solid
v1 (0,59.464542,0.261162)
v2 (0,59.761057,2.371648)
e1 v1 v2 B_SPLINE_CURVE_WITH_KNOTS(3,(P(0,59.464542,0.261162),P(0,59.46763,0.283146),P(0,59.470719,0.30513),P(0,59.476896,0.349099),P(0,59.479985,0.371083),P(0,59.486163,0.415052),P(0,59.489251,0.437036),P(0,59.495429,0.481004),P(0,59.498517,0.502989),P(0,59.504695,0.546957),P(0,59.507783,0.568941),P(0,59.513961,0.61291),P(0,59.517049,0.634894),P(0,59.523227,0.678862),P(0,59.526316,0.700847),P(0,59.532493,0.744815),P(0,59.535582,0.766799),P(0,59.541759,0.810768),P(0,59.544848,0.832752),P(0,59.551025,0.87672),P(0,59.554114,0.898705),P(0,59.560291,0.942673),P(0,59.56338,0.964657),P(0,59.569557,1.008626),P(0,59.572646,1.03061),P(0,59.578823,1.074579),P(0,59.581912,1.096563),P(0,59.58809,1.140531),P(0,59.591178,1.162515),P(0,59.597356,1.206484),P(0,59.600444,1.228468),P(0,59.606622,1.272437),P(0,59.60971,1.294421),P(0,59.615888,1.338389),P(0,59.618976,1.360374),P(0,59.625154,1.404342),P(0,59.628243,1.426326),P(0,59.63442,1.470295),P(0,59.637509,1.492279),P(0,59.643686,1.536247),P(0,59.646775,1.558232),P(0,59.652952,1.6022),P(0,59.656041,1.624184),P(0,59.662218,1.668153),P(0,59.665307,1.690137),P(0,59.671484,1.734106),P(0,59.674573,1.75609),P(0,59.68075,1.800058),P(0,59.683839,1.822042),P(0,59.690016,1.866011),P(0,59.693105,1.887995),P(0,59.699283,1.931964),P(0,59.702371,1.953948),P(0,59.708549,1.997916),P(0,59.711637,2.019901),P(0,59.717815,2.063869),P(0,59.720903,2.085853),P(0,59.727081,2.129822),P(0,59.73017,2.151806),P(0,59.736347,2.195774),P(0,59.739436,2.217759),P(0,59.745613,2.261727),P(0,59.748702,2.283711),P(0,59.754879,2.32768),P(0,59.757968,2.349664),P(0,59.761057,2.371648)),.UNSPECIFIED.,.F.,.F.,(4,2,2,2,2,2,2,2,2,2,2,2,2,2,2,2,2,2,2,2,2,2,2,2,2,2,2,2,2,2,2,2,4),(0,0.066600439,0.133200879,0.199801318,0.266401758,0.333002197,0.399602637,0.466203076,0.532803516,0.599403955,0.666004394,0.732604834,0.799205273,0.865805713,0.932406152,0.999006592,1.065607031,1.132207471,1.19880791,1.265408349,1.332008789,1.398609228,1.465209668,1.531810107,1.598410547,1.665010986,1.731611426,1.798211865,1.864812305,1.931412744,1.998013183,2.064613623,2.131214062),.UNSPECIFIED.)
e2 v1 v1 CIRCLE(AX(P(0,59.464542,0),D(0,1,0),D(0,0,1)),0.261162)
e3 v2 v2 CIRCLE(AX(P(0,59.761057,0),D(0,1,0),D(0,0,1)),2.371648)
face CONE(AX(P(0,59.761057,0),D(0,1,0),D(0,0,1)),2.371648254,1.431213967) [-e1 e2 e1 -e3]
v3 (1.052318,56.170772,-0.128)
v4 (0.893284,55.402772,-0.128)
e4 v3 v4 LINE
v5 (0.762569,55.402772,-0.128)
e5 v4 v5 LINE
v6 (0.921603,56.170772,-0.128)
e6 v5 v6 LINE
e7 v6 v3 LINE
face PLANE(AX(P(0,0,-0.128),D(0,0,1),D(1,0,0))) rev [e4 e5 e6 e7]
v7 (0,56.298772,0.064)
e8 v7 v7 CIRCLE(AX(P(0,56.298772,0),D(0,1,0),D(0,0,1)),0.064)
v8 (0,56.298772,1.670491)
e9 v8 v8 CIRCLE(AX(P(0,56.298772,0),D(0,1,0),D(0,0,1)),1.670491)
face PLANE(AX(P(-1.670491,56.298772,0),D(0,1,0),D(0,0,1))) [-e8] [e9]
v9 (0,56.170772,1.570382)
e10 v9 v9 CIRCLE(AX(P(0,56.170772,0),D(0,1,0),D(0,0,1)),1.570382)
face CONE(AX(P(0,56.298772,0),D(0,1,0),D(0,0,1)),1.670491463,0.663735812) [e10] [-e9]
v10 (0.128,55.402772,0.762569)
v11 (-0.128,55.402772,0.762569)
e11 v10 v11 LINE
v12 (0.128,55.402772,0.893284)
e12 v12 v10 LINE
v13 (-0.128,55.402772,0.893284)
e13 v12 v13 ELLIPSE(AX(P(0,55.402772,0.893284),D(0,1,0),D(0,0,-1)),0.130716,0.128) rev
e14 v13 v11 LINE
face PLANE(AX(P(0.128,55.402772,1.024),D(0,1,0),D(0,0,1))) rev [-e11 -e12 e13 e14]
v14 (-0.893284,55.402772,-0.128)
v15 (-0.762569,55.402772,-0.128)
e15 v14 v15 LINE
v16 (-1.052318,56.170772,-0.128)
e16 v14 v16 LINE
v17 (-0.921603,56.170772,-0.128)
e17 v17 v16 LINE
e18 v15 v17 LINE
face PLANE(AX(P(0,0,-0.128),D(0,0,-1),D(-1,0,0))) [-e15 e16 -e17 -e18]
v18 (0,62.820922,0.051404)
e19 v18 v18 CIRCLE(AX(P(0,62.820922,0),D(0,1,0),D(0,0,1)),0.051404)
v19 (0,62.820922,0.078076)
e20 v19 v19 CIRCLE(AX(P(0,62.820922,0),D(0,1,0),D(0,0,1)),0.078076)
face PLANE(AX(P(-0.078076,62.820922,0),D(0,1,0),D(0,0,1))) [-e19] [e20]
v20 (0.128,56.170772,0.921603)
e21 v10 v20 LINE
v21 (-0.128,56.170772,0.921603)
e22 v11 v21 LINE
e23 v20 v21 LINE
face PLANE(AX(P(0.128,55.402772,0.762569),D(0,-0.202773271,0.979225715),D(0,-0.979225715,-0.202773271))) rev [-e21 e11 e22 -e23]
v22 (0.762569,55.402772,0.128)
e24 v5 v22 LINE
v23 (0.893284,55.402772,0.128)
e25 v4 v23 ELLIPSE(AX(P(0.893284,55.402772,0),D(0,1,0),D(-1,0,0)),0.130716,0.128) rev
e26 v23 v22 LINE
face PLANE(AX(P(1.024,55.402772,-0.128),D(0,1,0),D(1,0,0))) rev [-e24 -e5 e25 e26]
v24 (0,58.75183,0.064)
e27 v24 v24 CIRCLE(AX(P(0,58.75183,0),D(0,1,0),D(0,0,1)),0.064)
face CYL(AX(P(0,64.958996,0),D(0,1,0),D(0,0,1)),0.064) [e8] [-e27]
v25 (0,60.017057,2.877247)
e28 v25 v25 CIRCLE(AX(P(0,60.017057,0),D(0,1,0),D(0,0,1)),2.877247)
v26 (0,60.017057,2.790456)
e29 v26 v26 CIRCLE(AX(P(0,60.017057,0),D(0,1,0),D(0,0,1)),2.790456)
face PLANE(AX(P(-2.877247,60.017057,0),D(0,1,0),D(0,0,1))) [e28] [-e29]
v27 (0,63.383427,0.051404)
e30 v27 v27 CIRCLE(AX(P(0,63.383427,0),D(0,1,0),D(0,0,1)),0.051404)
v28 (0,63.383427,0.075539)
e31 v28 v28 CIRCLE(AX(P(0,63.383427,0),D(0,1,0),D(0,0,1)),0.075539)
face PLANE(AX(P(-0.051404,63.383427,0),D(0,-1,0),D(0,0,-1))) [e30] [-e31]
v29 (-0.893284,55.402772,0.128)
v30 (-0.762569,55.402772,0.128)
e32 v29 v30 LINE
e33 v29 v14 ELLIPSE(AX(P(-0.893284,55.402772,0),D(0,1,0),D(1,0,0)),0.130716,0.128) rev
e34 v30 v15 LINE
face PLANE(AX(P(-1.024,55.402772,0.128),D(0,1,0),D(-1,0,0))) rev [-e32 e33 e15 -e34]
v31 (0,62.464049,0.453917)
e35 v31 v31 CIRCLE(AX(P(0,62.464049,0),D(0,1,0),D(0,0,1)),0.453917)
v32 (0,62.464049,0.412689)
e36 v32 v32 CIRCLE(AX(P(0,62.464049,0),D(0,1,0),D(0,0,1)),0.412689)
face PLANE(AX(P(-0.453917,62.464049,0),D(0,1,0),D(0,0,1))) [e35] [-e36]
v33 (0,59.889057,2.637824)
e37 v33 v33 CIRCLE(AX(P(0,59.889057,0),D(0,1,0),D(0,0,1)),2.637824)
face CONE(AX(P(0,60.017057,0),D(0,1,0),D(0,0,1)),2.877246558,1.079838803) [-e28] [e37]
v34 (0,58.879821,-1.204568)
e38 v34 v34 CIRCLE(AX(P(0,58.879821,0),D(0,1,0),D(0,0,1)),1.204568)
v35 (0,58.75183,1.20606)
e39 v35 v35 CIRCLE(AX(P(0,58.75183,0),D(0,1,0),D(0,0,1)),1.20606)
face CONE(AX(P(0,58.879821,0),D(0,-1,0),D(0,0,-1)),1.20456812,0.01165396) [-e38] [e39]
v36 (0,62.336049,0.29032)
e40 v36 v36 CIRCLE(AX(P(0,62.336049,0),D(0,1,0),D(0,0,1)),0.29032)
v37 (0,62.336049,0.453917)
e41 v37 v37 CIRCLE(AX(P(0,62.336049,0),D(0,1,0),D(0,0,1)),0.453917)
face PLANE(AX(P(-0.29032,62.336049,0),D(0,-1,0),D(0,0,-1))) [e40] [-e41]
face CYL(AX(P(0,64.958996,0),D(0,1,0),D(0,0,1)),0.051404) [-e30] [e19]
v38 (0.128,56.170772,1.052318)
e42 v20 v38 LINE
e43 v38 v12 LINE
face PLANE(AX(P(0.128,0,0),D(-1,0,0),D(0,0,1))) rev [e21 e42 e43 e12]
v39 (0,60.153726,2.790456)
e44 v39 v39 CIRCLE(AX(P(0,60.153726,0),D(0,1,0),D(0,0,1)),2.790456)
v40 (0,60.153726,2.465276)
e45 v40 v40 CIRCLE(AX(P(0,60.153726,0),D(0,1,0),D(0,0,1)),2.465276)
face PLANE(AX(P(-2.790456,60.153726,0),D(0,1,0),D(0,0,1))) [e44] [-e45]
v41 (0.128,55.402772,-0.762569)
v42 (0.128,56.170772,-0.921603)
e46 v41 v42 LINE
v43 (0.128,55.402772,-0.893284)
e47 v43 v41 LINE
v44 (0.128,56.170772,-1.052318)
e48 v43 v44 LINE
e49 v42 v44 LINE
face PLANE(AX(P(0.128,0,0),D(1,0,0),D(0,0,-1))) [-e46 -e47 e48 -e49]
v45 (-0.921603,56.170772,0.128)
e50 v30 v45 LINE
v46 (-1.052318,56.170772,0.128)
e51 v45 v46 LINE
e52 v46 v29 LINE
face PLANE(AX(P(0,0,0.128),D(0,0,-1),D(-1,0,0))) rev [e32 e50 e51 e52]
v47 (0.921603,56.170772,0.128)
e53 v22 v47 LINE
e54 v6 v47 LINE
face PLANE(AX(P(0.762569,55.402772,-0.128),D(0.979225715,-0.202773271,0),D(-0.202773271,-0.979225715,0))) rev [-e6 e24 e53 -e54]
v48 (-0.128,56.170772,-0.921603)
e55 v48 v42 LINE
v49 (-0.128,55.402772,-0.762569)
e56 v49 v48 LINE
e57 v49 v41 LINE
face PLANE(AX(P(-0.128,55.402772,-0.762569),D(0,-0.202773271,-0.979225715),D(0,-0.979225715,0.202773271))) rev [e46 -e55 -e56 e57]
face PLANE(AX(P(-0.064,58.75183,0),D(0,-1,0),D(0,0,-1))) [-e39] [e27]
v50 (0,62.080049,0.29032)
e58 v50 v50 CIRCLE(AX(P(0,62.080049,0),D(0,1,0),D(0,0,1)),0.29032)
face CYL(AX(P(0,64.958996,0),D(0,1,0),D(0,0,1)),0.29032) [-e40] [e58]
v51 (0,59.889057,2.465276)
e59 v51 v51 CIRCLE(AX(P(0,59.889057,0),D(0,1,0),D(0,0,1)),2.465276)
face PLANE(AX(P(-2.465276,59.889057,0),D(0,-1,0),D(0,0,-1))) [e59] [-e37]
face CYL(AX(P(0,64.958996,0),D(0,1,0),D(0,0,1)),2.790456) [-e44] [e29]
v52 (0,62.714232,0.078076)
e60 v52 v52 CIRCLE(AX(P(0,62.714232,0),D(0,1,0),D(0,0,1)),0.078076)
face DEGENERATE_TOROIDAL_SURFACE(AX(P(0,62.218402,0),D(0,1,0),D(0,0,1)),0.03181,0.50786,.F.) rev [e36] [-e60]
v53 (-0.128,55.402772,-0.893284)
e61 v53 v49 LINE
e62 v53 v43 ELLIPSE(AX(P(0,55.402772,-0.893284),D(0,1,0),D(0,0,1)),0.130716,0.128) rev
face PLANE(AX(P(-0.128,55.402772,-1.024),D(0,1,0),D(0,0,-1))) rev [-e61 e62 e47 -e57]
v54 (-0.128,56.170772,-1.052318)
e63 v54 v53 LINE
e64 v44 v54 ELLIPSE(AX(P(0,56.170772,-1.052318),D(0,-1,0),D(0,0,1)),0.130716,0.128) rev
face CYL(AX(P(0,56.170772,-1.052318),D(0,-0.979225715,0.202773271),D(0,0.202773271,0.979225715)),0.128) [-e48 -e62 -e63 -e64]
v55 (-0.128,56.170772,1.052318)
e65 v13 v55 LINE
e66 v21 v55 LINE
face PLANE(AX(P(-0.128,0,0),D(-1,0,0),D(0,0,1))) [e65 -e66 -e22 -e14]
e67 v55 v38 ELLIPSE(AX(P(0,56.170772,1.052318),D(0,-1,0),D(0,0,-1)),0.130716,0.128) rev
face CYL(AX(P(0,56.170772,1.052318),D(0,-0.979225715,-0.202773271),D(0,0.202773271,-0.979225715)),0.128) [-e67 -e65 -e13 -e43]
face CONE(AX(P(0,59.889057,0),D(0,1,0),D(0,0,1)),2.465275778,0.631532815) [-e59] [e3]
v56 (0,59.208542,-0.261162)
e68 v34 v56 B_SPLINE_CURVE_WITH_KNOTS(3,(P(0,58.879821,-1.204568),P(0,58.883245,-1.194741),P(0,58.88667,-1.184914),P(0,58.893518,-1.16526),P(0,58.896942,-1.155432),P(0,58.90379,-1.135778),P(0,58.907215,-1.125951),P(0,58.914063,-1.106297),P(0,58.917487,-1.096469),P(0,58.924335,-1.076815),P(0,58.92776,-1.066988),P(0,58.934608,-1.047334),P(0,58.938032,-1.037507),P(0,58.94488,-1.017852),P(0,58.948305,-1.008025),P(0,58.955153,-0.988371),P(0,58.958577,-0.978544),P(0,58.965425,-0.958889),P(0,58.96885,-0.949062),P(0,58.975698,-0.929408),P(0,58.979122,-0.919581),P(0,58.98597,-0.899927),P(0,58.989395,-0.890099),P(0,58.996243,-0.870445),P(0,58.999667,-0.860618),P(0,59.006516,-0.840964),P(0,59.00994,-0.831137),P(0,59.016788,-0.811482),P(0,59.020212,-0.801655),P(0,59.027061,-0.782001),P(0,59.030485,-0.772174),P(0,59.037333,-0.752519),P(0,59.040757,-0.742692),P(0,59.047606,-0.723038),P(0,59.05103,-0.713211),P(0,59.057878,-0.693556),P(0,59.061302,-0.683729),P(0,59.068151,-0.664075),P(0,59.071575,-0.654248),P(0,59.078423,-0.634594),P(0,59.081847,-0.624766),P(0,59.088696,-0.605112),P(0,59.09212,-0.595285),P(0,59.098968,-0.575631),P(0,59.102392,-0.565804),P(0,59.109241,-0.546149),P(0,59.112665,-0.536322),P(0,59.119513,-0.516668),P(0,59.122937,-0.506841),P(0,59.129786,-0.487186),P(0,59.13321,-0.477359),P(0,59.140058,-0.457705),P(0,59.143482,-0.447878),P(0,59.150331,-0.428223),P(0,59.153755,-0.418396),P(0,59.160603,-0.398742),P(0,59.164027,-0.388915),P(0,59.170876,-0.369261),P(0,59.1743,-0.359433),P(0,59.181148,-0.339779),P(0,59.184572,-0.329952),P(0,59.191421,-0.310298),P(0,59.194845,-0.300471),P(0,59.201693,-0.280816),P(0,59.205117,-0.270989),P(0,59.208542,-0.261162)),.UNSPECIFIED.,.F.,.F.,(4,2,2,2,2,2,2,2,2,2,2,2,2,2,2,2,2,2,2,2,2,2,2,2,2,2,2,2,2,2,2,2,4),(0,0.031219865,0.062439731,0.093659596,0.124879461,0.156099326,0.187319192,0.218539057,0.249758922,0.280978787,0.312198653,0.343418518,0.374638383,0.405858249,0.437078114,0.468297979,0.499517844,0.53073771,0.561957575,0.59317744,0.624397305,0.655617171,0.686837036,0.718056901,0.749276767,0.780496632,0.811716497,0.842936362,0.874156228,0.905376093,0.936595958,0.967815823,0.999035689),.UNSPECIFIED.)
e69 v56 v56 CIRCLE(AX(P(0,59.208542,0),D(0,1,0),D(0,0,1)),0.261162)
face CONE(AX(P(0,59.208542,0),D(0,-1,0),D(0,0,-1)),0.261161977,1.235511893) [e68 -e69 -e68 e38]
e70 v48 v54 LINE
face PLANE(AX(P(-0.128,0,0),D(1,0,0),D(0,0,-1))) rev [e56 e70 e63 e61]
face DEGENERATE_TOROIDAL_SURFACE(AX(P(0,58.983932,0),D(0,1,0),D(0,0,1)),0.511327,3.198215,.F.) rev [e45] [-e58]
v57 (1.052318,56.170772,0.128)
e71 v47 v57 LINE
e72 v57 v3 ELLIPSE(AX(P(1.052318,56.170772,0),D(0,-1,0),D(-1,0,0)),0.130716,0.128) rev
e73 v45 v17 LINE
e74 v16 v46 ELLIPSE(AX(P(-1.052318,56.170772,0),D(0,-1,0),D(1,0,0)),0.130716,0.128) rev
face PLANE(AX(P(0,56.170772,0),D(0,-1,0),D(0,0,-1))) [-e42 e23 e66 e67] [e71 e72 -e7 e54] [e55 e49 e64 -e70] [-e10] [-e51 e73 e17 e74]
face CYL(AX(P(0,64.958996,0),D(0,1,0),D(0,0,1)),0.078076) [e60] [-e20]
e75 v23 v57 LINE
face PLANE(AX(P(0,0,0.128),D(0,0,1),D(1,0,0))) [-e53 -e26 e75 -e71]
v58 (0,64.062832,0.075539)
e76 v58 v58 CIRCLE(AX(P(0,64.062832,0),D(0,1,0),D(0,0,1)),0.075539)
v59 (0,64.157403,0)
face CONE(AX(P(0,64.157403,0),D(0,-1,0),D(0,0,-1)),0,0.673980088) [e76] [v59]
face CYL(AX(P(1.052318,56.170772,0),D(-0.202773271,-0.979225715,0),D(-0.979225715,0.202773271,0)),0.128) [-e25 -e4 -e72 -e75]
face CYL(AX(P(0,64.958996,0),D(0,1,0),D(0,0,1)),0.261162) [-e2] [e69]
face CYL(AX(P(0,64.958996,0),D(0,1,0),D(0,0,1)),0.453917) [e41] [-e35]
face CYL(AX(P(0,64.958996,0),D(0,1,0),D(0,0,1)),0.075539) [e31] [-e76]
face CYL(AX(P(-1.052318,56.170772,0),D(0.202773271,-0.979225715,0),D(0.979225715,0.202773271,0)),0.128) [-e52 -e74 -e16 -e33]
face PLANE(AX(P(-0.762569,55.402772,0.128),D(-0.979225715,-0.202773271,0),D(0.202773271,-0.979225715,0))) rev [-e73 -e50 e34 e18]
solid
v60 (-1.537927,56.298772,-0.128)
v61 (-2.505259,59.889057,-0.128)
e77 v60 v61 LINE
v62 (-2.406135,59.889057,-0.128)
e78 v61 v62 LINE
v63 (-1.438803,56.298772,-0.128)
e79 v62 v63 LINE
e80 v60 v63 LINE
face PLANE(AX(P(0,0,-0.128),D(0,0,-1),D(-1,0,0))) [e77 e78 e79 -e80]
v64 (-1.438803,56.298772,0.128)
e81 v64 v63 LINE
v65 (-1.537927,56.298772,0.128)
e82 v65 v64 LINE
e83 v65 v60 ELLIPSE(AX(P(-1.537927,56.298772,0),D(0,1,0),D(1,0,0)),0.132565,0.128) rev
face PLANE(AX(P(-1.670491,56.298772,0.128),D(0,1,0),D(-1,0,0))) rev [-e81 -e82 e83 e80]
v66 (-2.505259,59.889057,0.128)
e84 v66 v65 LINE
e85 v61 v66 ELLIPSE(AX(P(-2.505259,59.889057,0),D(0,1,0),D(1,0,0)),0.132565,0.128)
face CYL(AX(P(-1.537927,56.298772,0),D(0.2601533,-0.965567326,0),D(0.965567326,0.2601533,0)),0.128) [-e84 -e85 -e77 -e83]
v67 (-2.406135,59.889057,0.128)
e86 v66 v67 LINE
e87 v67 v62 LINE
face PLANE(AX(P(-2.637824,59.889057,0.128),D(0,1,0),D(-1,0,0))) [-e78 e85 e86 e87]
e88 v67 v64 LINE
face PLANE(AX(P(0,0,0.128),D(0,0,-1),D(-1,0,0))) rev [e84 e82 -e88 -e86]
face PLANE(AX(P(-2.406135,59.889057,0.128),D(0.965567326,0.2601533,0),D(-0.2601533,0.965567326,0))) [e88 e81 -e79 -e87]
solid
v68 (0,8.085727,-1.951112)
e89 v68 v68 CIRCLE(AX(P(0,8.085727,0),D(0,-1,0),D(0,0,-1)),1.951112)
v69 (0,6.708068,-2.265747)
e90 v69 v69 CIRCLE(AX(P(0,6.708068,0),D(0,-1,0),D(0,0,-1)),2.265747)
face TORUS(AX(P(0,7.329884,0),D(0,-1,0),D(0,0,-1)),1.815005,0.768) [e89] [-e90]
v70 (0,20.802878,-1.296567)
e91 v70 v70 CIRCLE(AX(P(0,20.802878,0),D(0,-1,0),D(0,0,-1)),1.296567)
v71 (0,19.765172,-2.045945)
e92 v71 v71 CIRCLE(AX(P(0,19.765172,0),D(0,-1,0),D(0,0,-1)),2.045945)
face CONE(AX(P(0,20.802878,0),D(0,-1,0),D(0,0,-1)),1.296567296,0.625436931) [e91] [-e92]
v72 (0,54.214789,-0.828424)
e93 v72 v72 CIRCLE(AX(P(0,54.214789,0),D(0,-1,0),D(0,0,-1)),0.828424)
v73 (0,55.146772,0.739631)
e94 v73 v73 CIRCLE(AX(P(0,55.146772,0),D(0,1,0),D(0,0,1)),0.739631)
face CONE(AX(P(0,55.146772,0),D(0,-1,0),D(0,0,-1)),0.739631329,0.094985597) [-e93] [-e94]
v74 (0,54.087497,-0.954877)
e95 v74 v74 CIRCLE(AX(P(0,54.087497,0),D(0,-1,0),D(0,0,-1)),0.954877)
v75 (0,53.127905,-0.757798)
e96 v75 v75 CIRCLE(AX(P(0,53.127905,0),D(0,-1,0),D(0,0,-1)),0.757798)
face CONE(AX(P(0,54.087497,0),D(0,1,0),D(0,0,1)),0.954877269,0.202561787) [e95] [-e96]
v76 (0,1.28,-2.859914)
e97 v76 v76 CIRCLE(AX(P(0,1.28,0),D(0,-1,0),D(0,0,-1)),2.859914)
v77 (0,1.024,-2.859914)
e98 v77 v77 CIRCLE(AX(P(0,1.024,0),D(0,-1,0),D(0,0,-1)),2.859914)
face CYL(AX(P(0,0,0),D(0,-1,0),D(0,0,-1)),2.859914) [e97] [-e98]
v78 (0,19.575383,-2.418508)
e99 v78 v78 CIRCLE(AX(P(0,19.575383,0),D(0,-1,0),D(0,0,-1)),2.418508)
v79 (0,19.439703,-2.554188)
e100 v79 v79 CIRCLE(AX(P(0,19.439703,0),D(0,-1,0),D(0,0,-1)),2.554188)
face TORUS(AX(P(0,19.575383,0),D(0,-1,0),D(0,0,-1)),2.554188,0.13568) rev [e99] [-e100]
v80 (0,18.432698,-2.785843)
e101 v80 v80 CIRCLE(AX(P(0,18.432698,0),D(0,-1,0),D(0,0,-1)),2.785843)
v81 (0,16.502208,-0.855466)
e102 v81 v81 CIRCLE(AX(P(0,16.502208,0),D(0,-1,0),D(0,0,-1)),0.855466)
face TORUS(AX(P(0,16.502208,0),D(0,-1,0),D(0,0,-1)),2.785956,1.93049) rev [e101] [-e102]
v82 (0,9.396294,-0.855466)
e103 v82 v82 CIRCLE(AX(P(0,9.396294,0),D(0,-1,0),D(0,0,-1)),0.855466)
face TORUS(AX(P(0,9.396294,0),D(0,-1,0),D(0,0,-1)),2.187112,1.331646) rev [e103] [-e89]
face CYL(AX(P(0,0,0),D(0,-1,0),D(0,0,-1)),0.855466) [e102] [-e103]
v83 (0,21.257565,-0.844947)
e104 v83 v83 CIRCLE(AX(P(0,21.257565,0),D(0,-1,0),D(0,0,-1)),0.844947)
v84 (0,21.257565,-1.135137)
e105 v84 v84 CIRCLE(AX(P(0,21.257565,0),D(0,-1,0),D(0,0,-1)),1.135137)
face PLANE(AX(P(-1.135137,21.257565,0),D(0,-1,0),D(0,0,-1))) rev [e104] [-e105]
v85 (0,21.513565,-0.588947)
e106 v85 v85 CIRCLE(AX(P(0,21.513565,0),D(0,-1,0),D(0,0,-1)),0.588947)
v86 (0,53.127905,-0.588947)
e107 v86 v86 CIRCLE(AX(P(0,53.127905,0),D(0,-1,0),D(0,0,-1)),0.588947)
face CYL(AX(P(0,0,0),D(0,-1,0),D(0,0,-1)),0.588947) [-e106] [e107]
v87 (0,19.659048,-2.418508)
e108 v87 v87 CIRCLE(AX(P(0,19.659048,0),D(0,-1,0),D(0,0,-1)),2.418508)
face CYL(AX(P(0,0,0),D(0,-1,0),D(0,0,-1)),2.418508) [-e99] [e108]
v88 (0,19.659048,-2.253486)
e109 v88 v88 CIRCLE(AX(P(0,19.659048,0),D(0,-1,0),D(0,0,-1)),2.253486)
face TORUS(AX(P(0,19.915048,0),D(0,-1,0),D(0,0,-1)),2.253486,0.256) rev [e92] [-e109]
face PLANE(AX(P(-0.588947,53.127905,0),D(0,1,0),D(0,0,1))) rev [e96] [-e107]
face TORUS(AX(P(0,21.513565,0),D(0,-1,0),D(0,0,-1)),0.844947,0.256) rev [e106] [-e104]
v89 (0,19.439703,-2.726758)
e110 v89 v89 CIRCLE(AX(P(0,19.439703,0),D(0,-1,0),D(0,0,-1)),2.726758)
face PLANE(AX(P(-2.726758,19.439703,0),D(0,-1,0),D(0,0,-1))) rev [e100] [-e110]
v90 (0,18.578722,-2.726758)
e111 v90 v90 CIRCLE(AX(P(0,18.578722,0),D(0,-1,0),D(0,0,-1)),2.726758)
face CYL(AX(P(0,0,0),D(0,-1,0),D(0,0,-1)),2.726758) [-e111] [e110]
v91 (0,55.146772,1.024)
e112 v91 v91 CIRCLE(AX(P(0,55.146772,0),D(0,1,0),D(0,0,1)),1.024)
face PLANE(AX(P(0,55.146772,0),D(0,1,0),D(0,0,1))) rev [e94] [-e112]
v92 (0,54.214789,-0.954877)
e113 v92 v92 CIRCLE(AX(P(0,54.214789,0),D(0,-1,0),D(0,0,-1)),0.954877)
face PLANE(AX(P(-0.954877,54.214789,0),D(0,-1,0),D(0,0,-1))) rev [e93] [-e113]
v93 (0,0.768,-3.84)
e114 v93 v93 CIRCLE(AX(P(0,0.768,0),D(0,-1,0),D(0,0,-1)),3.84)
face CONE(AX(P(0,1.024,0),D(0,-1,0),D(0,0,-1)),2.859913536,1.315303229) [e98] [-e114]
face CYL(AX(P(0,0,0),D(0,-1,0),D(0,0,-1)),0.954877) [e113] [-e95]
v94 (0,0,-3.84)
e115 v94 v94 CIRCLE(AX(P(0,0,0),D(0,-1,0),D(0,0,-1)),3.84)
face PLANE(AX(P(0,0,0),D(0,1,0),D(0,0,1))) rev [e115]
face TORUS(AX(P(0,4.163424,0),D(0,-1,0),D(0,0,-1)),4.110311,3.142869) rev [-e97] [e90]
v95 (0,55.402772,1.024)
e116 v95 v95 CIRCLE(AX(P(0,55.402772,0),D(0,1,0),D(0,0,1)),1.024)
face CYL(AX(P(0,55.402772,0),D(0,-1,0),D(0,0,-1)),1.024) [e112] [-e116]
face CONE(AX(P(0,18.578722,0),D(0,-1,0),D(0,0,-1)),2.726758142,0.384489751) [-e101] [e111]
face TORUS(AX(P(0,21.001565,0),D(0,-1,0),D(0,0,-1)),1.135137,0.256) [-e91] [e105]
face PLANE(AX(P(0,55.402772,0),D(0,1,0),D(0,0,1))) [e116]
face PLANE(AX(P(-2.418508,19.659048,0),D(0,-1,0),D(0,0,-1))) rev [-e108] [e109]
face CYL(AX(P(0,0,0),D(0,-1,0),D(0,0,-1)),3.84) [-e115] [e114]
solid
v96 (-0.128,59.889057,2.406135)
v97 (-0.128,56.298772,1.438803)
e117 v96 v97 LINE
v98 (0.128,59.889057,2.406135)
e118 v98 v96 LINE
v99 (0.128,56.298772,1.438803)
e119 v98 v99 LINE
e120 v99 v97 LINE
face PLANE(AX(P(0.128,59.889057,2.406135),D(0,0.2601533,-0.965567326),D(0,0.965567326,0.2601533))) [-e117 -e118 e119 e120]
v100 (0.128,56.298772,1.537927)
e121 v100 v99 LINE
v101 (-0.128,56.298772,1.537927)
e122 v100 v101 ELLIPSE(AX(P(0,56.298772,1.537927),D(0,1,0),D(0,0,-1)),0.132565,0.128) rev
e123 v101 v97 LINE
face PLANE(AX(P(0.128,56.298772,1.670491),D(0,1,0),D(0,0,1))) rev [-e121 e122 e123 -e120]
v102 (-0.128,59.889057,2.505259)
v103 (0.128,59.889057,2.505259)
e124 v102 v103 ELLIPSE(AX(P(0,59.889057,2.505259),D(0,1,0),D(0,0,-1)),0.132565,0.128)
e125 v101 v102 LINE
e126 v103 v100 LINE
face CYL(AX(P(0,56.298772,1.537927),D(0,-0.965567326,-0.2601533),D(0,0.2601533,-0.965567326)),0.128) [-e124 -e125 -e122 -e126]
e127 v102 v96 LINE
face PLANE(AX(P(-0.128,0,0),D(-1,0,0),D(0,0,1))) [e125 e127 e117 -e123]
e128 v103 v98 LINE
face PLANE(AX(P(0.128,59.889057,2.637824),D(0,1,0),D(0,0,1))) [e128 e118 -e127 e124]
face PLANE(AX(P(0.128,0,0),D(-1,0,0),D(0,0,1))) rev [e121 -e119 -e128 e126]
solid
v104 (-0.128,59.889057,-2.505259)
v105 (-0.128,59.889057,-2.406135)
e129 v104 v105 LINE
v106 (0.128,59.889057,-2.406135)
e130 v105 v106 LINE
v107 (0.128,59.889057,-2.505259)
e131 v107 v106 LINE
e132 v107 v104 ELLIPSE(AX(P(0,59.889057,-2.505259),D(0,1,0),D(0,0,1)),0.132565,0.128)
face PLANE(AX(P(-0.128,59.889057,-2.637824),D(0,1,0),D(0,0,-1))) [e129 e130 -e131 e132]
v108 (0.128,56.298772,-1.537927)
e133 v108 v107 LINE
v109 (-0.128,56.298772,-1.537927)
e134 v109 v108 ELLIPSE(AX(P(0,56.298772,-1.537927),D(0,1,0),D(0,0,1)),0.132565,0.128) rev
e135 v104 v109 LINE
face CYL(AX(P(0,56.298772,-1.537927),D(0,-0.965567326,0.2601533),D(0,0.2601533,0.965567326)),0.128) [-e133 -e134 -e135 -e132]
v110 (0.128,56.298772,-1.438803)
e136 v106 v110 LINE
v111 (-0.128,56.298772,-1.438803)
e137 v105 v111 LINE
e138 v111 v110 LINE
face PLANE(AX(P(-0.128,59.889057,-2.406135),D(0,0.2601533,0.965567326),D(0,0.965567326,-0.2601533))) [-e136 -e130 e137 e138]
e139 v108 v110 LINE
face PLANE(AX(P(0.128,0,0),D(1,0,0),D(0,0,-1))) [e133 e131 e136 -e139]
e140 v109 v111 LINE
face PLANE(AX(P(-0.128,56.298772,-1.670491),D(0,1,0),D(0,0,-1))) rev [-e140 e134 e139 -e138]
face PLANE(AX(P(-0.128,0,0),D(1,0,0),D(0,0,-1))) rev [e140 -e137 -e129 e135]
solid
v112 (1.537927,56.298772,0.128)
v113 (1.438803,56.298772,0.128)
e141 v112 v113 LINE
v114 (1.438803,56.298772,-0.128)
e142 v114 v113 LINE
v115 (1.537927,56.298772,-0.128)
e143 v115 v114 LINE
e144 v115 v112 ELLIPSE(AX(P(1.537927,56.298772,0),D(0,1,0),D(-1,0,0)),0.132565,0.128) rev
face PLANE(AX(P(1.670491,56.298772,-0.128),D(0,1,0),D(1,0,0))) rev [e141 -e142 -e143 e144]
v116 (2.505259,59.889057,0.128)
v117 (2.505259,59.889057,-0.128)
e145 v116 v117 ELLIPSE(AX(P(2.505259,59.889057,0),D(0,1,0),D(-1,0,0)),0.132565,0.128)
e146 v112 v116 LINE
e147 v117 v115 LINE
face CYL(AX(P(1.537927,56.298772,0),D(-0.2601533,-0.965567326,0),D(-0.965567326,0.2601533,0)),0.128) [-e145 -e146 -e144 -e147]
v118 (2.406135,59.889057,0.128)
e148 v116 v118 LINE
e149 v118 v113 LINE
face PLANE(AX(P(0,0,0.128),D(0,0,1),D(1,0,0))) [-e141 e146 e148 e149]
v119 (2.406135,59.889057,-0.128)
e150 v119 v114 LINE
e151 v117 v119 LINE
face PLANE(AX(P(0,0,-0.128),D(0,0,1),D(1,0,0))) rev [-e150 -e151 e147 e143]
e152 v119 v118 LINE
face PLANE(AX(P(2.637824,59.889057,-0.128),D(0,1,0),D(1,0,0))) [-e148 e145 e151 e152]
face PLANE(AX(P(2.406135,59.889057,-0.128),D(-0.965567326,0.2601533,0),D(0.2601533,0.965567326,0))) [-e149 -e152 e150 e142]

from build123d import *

# Parameters (mm, degrees)
SKETCH2_R           = 4
BOSS_EXTRUDE1_DEPTH = 1
BOSS_EXTRUDE2_DEPTH = 0.5
FILLET3_START       = 212.525187044
FILLET3_DEPTH       = 4.474812956
CIRPATTERN1_COUNT   = 4
BOSS_EXTRUDE4_DEPTH = 0.5
FILLET6_START       = 213.806892112
FILLET6_DEPTH       = 16.193107888
CIRPATTERN2_COUNT   = 4
SCALE2_SCALE        = 0.5
SCALE3_SCALE        = 0.8
SCALE4_SCALE        = 0.8
SCALE5_SCALE        = 0.8


with BuildPart() as part:
    # Sketch1 → Revolve1 (revolve)
    with BuildSketch(Plane.XY, mode=Mode.PRIVATE) as revolve1_sk:
        with BuildLine():
            Line((0, 0), (-15, 0))
            Line((-15, 0), (-15, 3))
            Line((-15, 3), (-11.171537248, 4))
            Line((-11.171537248, 4), (-11.171537248, 5))
            ThreePointArc((-11.171537248, 5), (-3.851964378, 14.927509458), (-8.850574954, 26.20339006))
            ThreePointArc((-8.850574954, 26.20339006), (-10.014556555, 29.300311241), (-7.62153283, 31.58487059))
            ThreePointArc((-7.62153283, 31.58487059), (-4.552574194, 33.367898218), (-3.341662981, 36.704271797))
            Line((-3.341662981, 36.704271797), (-3.341662981, 64.461749864))
            ThreePointArc((-3.341662981, 64.461749864), (-5.550208704, 69.793870953), (-10.882200885, 72.002727875))
            Line((-10.882200885, 72.002727875), (-10.651398991, 72.573132865))
            Line((-10.651398991, 72.573132865), (-10.651398991, 75.936339111))
            Line((-10.651398991, 75.936339111), (-9.977298462, 75.936339111))
            ThreePointArc((-9.977298462, 75.936339111), (-9.602531868, 76.091572516), (-9.447298462, 76.466339111))
            Line((-9.447298462, 76.466339111), (-9.447298462, 76.793156254))
            Line((-9.447298462, 76.793156254), (-8.802681153, 76.793156254))
            ThreePointArc((-8.802681153, 76.793156254), (-8.347407363, 76.902804764), (-7.991973758, 77.207704702))
            Line((-7.991973758, 77.207704702), (-5.064715999, 81.261241678))
            ThreePointArc((-5.064715999, 81.261241678), (-5.376499637, 82.371935954), (-4.434130367, 83.037361359))
            Line((-4.434130367, 83.037361359), (-3.300573645, 83.037361359))
            ThreePointArc((-3.300573645, 83.037361359), (-2.593466864, 83.330254578), (-2.300573645, 84.037361359))
            Line((-2.300573645, 84.037361359), (-2.300573645, 207.530880287))
            Line((-2.300573645, 207.530880287), (-2.960147899, 207.530880287))
            Line((-2.960147899, 207.530880287), (-3.729989331, 211.279283847))
            Line((-3.729989331, 211.279283847), (-3.729989331, 211.776517679))
            Line((-3.729989331, 211.776517679), (-3.236029518, 211.776517679))
            Line((-3.236029518, 211.776517679), (-2.889184881, 215.417079112))
            Line((-2.889184881, 215.417079112), (0, 215.417079112))
            Line((0, 215.417079112), (0, 0))
        make_face()
    revolve(revolve1_sk.sketch.rotate(Axis((0, 0, 0), (0, 1, 0)), 270), axis=Axis((0, 0, 0), (0, 1, 0)))

    # Sketch2 → Boss-Extrude1 (add)
    with BuildSketch(Plane(origin=(0, 215.417079112, 0), x_dir=(1, 0, 0), z_dir=(0, 1, 0))):
        with Locations(Location((0, 0, 0), (0, 0, 270))):
            Circle(SKETCH2_R)
    extrude(amount=BOSS_EXTRUDE1_DEPTH)


with BuildPart() as body_2:
    # Sketch3 → Boss-Extrude2 (new, symmetric)
    with BuildSketch(Plane(origin=(0, 0, 0), x_dir=(0, 0, -1), z_dir=(1, 0, 0))):
        Polygon((-4, 216.417079112), (-2.978785271, 216.417079112), (-3.600010595, 219.417079112), (-4.621225324, 219.417079112), align=None)
    extrude(amount=BOSS_EXTRUDE2_DEPTH, both=True)

    # Fillet3: read off the stored shape, not the designer's step
    # Fillet3 outline → Fillet3 (cut)
    with BuildSketch(Plane(origin=(0, 0, 0), x_dir=(1, 0, 0), z_dir=(0, 0.9792257149089403, 0.20277327057843406)).offset(FILLET3_START)):
        with BuildLine():
            Line((0.5, 39.966696081), (0.5, 40.466696081))
            ThreePointArc((0.5, 40.466696081), (0.353553391, 40.11314269), (0, 39.966696081))
            Line((0, 39.966696081), (0.5, 39.966696081))
        make_face()
        with BuildLine():
            Line((-0.5, 39.966696081), (0, 39.966696081))
            ThreePointArc((0, 39.966696081), (-0.353553391, 40.11314269), (-0.5, 40.466696081))
            Line((-0.5, 40.466696081), (-0.5, 39.966696081))
        make_face()
    extrude(amount=FILLET3_DEPTH, mode=Mode.SUBTRACT)


with BuildPart() as cirpattern1_1:
    # CirPattern1: pattern copy
    add(body_2.part.rotate(Axis((0, 0, 0), (0, 1, 0)), 1 * 360 / CIRPATTERN1_COUNT))


with BuildPart() as cirpattern1_2:
    # CirPattern1: pattern copy
    add(body_2.part.rotate(Axis((0, 0, 0), (0, 1, 0)), 2 * 360 / CIRPATTERN1_COUNT))


with BuildPart() as cirpattern1_3:
    # CirPattern1: pattern copy
    add(body_2.part.rotate(Axis((0, 0, 0), (0, 1, 0)), 3 * 360 / CIRPATTERN1_COUNT))


with BuildPart() as body_2_1:
    add(body_2.part)

    add(cirpattern1_1.part)  # Revolve2 merges CirPattern1_1

    add(cirpattern1_2.part)  # Revolve2 merges CirPattern1_2

    add(cirpattern1_3.part)  # Revolve2 merges CirPattern1_3
    # Sketch5 → Revolve2 (revolve)
    with BuildSketch(Plane.XY, mode=Mode.PRIVATE) as revolve2_sk:
        with BuildLine():
            Line((0, 219.417079112), (-6.134303085, 219.417079112))
            Line((-6.134303085, 219.417079112), (-6.525357278, 219.917079112))
            Line((-6.525357278, 219.917079112), (-0.25, 219.917079112))
            Line((-0.25, 219.917079112), (-0.25, 229.499335405))
            Line((-0.25, 229.499335405), (-4.711171069, 229.499335405))
            Line((-4.711171069, 229.499335405), (-4.70534422, 229.999301452))
            Line((-4.70534422, 229.999301452), (-1.020163974, 231.283365843))
            Line((-1.020163974, 231.283365843), (-1.020163974, 232.283365843))
            Line((-1.020163974, 232.283365843), (-9.264250991, 233.441626978))
            Line((-9.264250991, 233.441626978), (-9.629983506, 233.941626978))
            Line((-9.629983506, 233.941626978), (-10.303998398, 233.941626978))
            Line((-10.303998398, 233.941626978), (-11.239244366, 234.441626978))
            Line((-11.239244366, 234.441626978), (-10.900217703, 234.441626978))
            Line((-10.900217703, 234.441626978), (-10.900217703, 234.975491897))
            Line((-10.900217703, 234.975491897), (-9.629983506, 234.975491897))
            ThreePointArc((-9.629983506, 234.975491897), (-6.285788492, 239.758257917), (-1.134061741, 242.500192013))
            Line((-1.134061741, 242.500192013), (-1.134061741, 243.500192013))
            Line((-1.134061741, 243.500192013), (-1.77311388, 243.500192013))
            Line((-1.77311388, 243.500192013), (-1.77311388, 244.000192013))
            Line((-1.77311388, 244.000192013), (-1.612067551, 244.000192013))
            ThreePointArc((-1.612067551, 244.000192013), (-1.063676925, 244.629465444), (-0.304985725, 244.977466873))
            Line((-0.304985725, 244.977466873), (-0.304985725, 245.394225833))
            Line((-0.304985725, 245.394225833), (-0.200795985, 245.394225833))
            Line((-0.200795985, 245.394225833), (-0.200795985, 247.59151046))
            Line((-0.200795985, 247.59151046), (-0.295074341, 247.59151046))
            Line((-0.295074341, 247.59151046), (-0.295074341, 250.245436668))
            Line((-0.295074341, 250.245436668), (0, 250.614855446))
            Line((0, 250.614855446), (0, 219.417079112))
        make_face()
    revolve(revolve2_sk.sketch.rotate(Axis((0, 253.746079201, 0), (0, -1, 0)), 270), axis=Axis((0, 253.746079201, 0), (0, -1, 0)))


with BuildPart() as body_3:
    # Sketch6 → Boss-Extrude4 (new, symmetric)
    with BuildSketch(Plane(origin=(0, 0, 0), x_dir=(0, 0, -1), z_dir=(1, 0, 0))):
        Polygon((-10.303998398, 233.941626978), (-6.525357278, 219.917079112), (-5.620325127, 219.917079112), (-9.398966247, 233.941626978), align=None)
    extrude(amount=BOSS_EXTRUDE4_DEPTH, both=True)

    # Fillet6: read off the stored shape, not the designer's step
    # Fillet6 outline → Fillet6 (cut)
    with BuildSketch(Plane(origin=(0, 0, 0), x_dir=(1, 0, 0), z_dir=(0, 0.9655673258451928, 0.26015329953733696)).offset(FILLET6_START)):
        with BuildLine():
            Line((0.5, 50.911481979), (0.5, 51.411481979))
            ThreePointArc((0.5, 51.411481979), (0.353553391, 51.057928588), (0, 50.911481979))
            Line((0, 50.911481979), (0.5, 50.911481979))
        make_face()
        with BuildLine():
            Line((-0.5, 50.911481979), (0, 50.911481979))
            ThreePointArc((0, 50.911481979), (-0.353553391, 51.057928588), (-0.5, 51.411481979))
            Line((-0.5, 51.411481979), (-0.5, 50.911481979))
        make_face()
    extrude(amount=FILLET6_DEPTH, mode=Mode.SUBTRACT)


with BuildPart() as cirpattern2_1:
    # CirPattern2: pattern copy
    add(body_3.part.rotate(Axis((0, 0, 0), (0, 1, 0)), 1 * 360 / CIRPATTERN2_COUNT))


with BuildPart() as cirpattern2_2:
    # CirPattern2: pattern copy
    add(body_3.part.rotate(Axis((0, 0, 0), (0, 1, 0)), 2 * 360 / CIRPATTERN2_COUNT))


with BuildPart() as cirpattern2_3:
    # CirPattern2: pattern copy
    add(body_3.part.rotate(Axis((0, 0, 0), (0, 1, 0)), 3 * 360 / CIRPATTERN2_COUNT))


with BuildPart() as cirpattern2_1_1:
    # Scale2: scaled about (0, 0, 0)
    add(cirpattern2_1.part.scale(SCALE2_SCALE))


with BuildPart() as part_1:
    # Scale2: scaled about (0, 0, 0)
    add(part.part.scale(SCALE2_SCALE))


with BuildPart() as cirpattern2_2_1:
    # Scale2: scaled about (0, 0, 0)
    add(cirpattern2_2.part.scale(SCALE2_SCALE))


with BuildPart() as body_2_2:
    # Scale2: scaled about (0, 0, 0)
    add(body_2_1.part.scale(SCALE2_SCALE))


with BuildPart() as cirpattern2_3_1:
    # Scale2: scaled about (0, 0, 0)
    add(cirpattern2_3.part.scale(SCALE2_SCALE))


with BuildPart() as body_3_1:
    # Scale2: scaled about (0, 0, 0)
    add(body_3.part.scale(SCALE2_SCALE))


with BuildPart() as body_2_3:
    # Scale3: scaled about (0, 0, 0)
    add(body_2_2.part.scale(SCALE3_SCALE))


with BuildPart() as cirpattern2_1_2:
    # Scale3: scaled about (0, 0, 0)
    add(cirpattern2_1_1.part.scale(SCALE3_SCALE))


with BuildPart() as cirpattern2_3_2:
    # Scale3: scaled about (0, 0, 0)
    add(cirpattern2_3_1.part.scale(SCALE3_SCALE))


with BuildPart() as part_2:
    # Scale3: scaled about (0, 0, 0)
    add(part_1.part.scale(SCALE3_SCALE))


with BuildPart() as body_3_2:
    # Scale3: scaled about (0, 0, 0)
    add(body_3_1.part.scale(SCALE3_SCALE))


with BuildPart() as cirpattern2_2_2:
    # Scale3: scaled about (0, 0, 0)
    add(cirpattern2_2_1.part.scale(SCALE3_SCALE))


with BuildPart() as body_2_4:
    # Scale4: scaled about (0, 0, 0)
    add(body_2_3.part.scale(SCALE4_SCALE))


with BuildPart() as body_3_3:
    # Scale4: scaled about (0, 0, 0)
    add(body_3_2.part.scale(SCALE4_SCALE))


with BuildPart() as cirpattern2_2_3:
    # Scale4: scaled about (0, 0, 0)
    add(cirpattern2_2_2.part.scale(SCALE4_SCALE))


with BuildPart() as cirpattern2_1_3:
    # Scale4: scaled about (0, 0, 0)
    add(cirpattern2_1_2.part.scale(SCALE4_SCALE))


with BuildPart() as cirpattern2_3_3:
    # Scale4: scaled about (0, 0, 0)
    add(cirpattern2_3_2.part.scale(SCALE4_SCALE))


with BuildPart() as part_3:
    # Scale4: scaled about (0, 0, 0)
    add(part_2.part.scale(SCALE4_SCALE))


with BuildPart() as cirpattern2_2_4:
    # Scale5: scaled about (0, 0, 0)
    add(cirpattern2_2_3.part.scale(SCALE5_SCALE))


with BuildPart() as cirpattern2_1_4:
    # Scale5: scaled about (0, 0, 0)
    add(cirpattern2_1_3.part.scale(SCALE5_SCALE))


with BuildPart() as body_2_5:
    # Scale5: scaled about (0, 0, 0)
    add(body_2_4.part.scale(SCALE5_SCALE))


with BuildPart() as cirpattern2_3_4:
    # Scale5: scaled about (0, 0, 0)
    add(cirpattern2_3_3.part.scale(SCALE5_SCALE))


with BuildPart() as part_4:
    # Scale5: scaled about (0, 0, 0)
    add(part_3.part.scale(SCALE5_SCALE))


with BuildPart() as body_3_4:
    # Scale5: scaled about (0, 0, 0)
    add(body_3_3.part.scale(SCALE5_SCALE))


solid = Compound([cirpattern2_2_4.part, cirpattern2_1_4.part, body_2_5.part, cirpattern2_3_4.part, part_4.part, body_3_4.part])
